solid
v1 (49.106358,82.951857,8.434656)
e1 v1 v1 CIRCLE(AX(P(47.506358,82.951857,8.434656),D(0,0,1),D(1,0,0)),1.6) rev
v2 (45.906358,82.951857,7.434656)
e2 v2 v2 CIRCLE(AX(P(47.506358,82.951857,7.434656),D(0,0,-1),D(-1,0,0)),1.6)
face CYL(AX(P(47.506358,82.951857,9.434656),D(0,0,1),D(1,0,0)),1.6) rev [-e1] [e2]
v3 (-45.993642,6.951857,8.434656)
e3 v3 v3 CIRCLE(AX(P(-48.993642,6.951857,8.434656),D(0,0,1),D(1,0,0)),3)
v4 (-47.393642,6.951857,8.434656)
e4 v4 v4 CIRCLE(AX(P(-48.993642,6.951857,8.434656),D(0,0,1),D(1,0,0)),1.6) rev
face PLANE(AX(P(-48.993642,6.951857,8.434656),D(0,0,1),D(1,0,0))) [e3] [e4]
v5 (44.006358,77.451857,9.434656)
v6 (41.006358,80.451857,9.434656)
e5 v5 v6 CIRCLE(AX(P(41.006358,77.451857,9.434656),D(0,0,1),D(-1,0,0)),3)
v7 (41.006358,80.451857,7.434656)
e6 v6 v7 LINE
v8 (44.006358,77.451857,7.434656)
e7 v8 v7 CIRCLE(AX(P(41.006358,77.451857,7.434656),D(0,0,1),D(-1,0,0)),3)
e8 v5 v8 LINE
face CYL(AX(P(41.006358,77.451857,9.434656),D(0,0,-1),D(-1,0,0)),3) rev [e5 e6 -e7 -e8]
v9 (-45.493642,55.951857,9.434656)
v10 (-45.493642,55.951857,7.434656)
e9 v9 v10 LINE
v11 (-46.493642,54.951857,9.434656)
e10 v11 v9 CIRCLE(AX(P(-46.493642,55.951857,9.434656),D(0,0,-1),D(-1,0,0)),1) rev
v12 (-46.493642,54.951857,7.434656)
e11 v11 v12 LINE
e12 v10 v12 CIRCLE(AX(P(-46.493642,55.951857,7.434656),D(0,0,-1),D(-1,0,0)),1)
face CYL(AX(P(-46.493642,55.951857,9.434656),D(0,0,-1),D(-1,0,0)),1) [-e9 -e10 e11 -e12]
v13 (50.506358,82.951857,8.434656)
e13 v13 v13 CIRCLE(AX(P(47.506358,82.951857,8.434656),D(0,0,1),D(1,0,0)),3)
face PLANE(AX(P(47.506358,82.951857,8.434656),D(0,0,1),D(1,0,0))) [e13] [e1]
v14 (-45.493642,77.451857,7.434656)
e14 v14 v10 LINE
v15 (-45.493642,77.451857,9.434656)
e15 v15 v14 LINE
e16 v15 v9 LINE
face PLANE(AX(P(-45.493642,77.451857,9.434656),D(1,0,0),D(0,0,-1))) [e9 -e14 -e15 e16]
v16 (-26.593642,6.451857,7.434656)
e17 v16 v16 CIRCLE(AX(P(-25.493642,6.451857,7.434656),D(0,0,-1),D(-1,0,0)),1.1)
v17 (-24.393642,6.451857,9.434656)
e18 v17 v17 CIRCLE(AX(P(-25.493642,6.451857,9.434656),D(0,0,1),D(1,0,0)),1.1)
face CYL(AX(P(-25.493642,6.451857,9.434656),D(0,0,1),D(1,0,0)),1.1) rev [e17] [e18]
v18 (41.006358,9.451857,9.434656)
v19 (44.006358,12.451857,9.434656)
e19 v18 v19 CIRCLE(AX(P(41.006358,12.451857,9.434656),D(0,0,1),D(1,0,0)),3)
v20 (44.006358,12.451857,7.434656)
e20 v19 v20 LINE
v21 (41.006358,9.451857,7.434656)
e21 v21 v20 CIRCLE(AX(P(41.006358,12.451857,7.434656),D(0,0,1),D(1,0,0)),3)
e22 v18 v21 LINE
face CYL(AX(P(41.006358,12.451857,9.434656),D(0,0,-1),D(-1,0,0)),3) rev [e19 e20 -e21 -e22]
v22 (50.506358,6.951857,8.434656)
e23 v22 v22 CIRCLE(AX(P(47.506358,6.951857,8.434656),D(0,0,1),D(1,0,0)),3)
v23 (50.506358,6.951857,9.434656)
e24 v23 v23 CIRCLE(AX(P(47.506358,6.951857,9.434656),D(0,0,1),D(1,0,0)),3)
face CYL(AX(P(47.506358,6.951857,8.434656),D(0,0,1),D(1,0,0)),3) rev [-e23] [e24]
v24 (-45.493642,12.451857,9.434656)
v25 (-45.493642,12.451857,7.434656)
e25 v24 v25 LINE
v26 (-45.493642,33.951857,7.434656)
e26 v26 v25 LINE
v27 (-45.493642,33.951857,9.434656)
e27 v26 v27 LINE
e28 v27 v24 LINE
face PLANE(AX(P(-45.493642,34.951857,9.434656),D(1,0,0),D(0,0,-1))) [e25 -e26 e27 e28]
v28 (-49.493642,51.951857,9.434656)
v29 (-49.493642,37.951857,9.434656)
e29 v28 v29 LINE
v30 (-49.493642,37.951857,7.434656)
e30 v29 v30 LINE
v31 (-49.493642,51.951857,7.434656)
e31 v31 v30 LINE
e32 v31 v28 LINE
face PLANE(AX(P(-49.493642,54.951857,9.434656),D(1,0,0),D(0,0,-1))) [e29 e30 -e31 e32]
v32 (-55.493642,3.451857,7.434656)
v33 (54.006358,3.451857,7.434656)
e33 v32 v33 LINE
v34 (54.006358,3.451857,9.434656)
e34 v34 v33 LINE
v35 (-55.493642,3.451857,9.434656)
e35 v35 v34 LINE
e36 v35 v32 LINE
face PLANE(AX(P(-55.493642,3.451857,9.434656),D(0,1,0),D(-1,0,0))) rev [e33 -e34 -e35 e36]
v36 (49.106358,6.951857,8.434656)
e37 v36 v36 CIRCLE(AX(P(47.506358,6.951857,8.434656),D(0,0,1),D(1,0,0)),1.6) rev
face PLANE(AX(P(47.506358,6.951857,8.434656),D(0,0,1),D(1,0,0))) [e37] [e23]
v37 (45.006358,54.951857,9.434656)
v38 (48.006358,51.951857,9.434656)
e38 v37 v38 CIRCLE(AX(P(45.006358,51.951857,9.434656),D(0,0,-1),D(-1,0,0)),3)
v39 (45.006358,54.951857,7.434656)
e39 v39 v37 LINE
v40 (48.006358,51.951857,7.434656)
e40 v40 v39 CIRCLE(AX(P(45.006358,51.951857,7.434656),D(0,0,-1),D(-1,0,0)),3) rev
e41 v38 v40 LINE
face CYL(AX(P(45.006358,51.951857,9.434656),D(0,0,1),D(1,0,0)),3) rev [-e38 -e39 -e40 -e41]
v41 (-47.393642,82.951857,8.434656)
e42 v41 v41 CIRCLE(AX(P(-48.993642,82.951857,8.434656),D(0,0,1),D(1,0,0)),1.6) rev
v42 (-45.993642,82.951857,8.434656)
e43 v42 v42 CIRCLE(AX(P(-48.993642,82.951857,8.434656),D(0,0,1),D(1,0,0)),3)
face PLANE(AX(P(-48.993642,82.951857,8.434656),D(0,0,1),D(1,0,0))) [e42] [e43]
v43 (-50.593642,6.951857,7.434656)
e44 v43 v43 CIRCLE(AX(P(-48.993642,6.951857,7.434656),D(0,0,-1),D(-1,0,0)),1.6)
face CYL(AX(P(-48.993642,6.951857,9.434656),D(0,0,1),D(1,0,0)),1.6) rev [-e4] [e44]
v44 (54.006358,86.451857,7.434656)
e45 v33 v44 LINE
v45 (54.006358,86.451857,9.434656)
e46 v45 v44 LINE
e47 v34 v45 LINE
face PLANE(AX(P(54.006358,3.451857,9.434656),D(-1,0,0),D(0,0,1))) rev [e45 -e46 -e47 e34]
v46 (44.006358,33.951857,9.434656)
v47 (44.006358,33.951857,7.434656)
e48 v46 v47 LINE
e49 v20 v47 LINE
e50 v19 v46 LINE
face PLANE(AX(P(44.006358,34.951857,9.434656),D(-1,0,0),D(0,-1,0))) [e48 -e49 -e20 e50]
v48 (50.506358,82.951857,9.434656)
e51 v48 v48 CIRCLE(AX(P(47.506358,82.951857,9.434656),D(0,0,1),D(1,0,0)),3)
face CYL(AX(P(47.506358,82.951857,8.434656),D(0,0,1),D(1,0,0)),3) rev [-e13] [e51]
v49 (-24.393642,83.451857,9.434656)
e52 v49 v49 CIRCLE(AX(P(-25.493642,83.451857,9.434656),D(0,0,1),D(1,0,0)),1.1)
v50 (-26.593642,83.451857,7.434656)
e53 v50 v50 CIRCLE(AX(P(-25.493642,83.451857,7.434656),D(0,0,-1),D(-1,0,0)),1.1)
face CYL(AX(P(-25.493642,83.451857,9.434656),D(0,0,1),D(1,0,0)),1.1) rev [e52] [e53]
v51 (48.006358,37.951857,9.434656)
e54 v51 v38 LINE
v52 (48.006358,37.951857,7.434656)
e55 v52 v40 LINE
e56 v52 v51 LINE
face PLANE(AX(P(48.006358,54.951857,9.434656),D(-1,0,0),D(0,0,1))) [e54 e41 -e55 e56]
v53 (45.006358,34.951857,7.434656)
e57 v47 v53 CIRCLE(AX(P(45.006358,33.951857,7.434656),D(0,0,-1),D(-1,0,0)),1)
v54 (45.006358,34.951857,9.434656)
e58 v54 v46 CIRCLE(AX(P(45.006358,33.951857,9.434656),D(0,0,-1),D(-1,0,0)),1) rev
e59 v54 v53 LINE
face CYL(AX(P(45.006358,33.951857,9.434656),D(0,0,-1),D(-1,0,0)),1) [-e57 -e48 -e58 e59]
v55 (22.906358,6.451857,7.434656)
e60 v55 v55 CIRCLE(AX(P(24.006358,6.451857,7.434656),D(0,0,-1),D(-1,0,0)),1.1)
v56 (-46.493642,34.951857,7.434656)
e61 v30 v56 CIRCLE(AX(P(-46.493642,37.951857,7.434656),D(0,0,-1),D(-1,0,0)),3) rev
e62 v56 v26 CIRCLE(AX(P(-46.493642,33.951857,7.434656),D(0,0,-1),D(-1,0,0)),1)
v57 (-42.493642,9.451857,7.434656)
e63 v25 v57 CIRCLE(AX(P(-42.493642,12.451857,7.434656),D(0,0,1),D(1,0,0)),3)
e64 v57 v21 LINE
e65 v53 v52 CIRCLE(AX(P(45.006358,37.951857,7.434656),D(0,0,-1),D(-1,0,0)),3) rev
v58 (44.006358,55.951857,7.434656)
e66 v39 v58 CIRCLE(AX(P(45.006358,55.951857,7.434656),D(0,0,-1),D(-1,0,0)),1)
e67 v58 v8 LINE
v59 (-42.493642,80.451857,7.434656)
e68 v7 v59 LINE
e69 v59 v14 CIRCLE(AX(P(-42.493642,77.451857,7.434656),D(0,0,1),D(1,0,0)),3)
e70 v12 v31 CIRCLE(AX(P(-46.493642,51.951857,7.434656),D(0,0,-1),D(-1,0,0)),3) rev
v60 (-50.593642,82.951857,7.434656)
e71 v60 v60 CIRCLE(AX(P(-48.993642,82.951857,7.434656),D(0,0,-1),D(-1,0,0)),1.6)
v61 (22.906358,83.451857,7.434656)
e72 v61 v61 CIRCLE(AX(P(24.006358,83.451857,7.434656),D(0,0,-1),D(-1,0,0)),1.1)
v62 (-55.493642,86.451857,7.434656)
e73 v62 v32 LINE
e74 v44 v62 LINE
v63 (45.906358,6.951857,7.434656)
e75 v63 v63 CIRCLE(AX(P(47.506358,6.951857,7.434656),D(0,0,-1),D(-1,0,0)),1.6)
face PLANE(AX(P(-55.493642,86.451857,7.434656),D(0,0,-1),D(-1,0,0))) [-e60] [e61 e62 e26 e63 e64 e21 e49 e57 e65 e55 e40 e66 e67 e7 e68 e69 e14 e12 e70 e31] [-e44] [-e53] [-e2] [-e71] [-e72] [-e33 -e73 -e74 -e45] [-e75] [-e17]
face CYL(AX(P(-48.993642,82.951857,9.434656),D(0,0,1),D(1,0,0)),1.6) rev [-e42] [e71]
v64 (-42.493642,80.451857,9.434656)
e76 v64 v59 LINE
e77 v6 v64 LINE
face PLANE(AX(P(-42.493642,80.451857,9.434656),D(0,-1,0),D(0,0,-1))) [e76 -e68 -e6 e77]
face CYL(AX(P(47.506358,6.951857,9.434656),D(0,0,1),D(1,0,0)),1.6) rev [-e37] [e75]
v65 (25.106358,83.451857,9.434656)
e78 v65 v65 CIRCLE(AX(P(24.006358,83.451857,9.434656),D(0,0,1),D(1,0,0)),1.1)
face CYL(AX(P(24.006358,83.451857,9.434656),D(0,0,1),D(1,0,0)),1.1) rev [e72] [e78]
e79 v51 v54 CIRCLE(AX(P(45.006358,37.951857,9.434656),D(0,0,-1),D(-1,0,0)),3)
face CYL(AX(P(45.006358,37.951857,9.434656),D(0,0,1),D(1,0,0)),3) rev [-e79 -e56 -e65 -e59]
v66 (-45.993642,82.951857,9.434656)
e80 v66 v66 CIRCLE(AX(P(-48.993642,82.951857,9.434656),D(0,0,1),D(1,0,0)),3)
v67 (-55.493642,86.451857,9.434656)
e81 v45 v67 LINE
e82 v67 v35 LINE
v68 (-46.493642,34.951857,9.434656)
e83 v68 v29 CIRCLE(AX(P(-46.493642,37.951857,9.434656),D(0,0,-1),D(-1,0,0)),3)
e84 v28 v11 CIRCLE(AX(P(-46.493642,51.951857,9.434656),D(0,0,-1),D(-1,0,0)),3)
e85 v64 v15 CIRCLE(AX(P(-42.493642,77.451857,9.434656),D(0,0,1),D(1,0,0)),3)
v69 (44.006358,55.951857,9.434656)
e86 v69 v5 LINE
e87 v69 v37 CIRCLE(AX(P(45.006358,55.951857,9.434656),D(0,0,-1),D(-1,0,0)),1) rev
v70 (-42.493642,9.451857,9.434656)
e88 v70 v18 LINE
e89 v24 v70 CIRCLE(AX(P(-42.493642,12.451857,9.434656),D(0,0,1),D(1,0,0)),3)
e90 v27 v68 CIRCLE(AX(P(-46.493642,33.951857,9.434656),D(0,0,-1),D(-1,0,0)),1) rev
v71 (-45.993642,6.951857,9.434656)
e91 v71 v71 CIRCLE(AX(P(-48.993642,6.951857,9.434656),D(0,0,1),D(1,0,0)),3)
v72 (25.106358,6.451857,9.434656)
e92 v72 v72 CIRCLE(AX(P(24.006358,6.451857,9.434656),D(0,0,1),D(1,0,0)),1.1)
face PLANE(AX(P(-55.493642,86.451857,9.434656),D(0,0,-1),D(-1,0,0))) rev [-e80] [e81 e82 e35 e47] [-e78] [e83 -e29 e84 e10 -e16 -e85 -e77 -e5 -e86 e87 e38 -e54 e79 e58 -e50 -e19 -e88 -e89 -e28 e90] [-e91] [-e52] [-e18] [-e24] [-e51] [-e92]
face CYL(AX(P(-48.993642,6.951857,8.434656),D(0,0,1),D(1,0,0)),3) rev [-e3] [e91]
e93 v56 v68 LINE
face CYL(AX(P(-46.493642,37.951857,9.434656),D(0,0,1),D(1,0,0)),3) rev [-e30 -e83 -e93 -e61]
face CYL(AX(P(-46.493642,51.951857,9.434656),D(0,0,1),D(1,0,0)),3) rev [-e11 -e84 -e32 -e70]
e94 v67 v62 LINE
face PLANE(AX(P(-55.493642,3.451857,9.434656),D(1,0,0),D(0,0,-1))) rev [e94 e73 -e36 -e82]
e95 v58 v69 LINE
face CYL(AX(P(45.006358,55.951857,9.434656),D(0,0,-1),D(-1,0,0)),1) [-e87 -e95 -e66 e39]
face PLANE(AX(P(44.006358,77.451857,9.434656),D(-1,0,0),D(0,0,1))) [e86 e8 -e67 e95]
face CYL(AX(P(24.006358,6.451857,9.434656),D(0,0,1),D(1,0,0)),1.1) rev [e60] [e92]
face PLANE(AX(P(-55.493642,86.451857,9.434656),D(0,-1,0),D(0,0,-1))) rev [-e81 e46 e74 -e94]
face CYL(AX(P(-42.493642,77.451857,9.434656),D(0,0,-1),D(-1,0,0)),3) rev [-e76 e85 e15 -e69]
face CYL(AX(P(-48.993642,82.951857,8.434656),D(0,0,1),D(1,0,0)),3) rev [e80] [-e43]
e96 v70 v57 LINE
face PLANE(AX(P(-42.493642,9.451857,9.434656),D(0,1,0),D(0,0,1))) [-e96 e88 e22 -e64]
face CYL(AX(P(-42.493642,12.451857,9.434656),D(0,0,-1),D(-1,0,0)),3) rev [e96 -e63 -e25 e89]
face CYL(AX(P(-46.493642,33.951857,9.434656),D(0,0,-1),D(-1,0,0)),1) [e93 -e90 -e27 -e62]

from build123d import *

# Parameters (mm, degrees)
SKETCH1_W                  = 109.5
SKETCH1_H                  = 83
BOSS_EXTRUDE1_DEPTH        = 2
F_3_2_3_2_DIAMETER_HOLE1_D = 3.2
F_2_2_2_2_DIAMETER_HOLE1_D = 2.2
SKETCH12_R                 = 3
CUT_EXTRUDE1_DEPTH         = 1
FILLET1_R                  = 3
FILLET2_R                  = 1


with BuildPart() as part:
    # Sketch1 → Boss-Extrude1 (new body)
    with BuildSketch(Plane.XY.offset(7.43465612)):
        with Locations((-0.743641502, 44.95185693)):
            Rectangle(SKETCH1_W, SKETCH1_H)
        with BuildLine():
            Line((-42.493641502, 80.45185693), (41.006358498, 80.45185693))
            ThreePointArc((41.006358498, 80.45185693), (43.127678842, 79.573177274), (44.006358498, 77.45185693))
            Line((44.006358498, 77.45185693), (44.006358498, 54.95185693))
            Line((44.006358498, 54.95185693), (48.006358498, 54.95185693))
            Line((48.006358498, 54.95185693), (48.006358498, 44.95185693))
            Line((48.006358498, 44.95185693), (48.006358498, 34.95185693))
            Line((48.006358498, 34.95185693), (44.006358498, 34.95185693))
            Line((44.006358498, 34.95185693), (44.006358498, 12.45185693))
            ThreePointArc((44.006358498, 12.45185693), (43.127678842, 10.330536587), (41.006358498, 9.45185693))
            Line((41.006358498, 9.45185693), (-42.493641502, 9.45185693))
            ThreePointArc((-42.493641502, 9.45185693), (-44.614961845, 10.330536587), (-45.493641502, 12.45185693))
            Line((-45.493641502, 12.45185693), (-45.493641502, 34.95185693))
            Line((-45.493641502, 34.95185693), (-49.493641502, 34.95185693))
            Line((-49.493641502, 34.95185693), (-49.493641502, 54.95185693))
            Line((-49.493641502, 54.95185693), (-45.493641502, 54.95185693))
            Line((-45.493641502, 54.95185693), (-45.493641502, 77.45185693))
            ThreePointArc((-45.493641502, 77.45185693), (-44.614961845, 79.573177274), (-42.493641502, 80.45185693))
        make_face(mode=Mode.SUBTRACT)
    extrude(amount=BOSS_EXTRUDE1_DEPTH)

    # Ø3.2 (3.2) Diameter Hole1 (through all)
    with Locations(Plane.XY.offset(9.43465612)):
        with Locations((-48.993641502, 6.95185693), (-48.993641502, 82.95185693), (47.506358498, 82.95185693), (47.506358498, 6.95185693)):
            Hole(F_3_2_3_2_DIAMETER_HOLE1_D / 2)

    # Ø2.2 (2.2) Diameter Hole1 (through all)
    with Locations(Plane(origin=(-25.493641502, 83.45185693, 9.43465612), x_dir=(1, 0, 0), z_dir=(0, 0, 1))):
        with Locations((0, 0), (49.5, 0), (49.5, -77), (0, -77)):
            Hole(F_2_2_2_2_DIAMETER_HOLE1_D / 2)

    # Sketch12 → Cut-Extrude1 (cut)
    with BuildSketch(Plane.XY.offset(9.43465612)):
        with Locations((-48.993641502, 82.95185693)):
            Circle(SKETCH12_R)
        with Locations((47.506358498, 82.95185693)):
            Circle(SKETCH12_R)
        with Locations((47.506358498, 6.95185693)):
            Circle(SKETCH12_R)
        with Locations((-48.993641502, 6.95185693)):
            Circle(SKETCH12_R)
    extrude(amount=-CUT_EXTRUDE1_DEPTH, mode=Mode.SUBTRACT)

    # Fillet1
    fillet1_edges = [part.edges().sort_by_distance(p)[0] for p in [
        (48.006358498, 34.95185693, 8.43465612),
        (48.006358498, 54.95185693, 8.43465612),
        (-49.493641502, 54.95185693, 8.43465612),
        (-49.493641502, 34.95185693, 8.43465612),
    ]]
    fillet(fillet1_edges, radius=FILLET1_R)

    # Fillet2
    fillet2_edges = [part.edges().sort_by_distance(p)[0] for p in [
        (44.006358498, 34.95185693, 8.43465612),
        (44.006358498, 54.95185693, 8.43465612),
        (-45.493641502, 34.95185693, 8.43465612),
        (-45.493641502, 54.95185693, 8.43465612),
    ]]
    fillet(fillet2_edges, radius=FILLET2_R - 0.0001)  # a hair under: the kernel refuses the full size


solid = part.part
